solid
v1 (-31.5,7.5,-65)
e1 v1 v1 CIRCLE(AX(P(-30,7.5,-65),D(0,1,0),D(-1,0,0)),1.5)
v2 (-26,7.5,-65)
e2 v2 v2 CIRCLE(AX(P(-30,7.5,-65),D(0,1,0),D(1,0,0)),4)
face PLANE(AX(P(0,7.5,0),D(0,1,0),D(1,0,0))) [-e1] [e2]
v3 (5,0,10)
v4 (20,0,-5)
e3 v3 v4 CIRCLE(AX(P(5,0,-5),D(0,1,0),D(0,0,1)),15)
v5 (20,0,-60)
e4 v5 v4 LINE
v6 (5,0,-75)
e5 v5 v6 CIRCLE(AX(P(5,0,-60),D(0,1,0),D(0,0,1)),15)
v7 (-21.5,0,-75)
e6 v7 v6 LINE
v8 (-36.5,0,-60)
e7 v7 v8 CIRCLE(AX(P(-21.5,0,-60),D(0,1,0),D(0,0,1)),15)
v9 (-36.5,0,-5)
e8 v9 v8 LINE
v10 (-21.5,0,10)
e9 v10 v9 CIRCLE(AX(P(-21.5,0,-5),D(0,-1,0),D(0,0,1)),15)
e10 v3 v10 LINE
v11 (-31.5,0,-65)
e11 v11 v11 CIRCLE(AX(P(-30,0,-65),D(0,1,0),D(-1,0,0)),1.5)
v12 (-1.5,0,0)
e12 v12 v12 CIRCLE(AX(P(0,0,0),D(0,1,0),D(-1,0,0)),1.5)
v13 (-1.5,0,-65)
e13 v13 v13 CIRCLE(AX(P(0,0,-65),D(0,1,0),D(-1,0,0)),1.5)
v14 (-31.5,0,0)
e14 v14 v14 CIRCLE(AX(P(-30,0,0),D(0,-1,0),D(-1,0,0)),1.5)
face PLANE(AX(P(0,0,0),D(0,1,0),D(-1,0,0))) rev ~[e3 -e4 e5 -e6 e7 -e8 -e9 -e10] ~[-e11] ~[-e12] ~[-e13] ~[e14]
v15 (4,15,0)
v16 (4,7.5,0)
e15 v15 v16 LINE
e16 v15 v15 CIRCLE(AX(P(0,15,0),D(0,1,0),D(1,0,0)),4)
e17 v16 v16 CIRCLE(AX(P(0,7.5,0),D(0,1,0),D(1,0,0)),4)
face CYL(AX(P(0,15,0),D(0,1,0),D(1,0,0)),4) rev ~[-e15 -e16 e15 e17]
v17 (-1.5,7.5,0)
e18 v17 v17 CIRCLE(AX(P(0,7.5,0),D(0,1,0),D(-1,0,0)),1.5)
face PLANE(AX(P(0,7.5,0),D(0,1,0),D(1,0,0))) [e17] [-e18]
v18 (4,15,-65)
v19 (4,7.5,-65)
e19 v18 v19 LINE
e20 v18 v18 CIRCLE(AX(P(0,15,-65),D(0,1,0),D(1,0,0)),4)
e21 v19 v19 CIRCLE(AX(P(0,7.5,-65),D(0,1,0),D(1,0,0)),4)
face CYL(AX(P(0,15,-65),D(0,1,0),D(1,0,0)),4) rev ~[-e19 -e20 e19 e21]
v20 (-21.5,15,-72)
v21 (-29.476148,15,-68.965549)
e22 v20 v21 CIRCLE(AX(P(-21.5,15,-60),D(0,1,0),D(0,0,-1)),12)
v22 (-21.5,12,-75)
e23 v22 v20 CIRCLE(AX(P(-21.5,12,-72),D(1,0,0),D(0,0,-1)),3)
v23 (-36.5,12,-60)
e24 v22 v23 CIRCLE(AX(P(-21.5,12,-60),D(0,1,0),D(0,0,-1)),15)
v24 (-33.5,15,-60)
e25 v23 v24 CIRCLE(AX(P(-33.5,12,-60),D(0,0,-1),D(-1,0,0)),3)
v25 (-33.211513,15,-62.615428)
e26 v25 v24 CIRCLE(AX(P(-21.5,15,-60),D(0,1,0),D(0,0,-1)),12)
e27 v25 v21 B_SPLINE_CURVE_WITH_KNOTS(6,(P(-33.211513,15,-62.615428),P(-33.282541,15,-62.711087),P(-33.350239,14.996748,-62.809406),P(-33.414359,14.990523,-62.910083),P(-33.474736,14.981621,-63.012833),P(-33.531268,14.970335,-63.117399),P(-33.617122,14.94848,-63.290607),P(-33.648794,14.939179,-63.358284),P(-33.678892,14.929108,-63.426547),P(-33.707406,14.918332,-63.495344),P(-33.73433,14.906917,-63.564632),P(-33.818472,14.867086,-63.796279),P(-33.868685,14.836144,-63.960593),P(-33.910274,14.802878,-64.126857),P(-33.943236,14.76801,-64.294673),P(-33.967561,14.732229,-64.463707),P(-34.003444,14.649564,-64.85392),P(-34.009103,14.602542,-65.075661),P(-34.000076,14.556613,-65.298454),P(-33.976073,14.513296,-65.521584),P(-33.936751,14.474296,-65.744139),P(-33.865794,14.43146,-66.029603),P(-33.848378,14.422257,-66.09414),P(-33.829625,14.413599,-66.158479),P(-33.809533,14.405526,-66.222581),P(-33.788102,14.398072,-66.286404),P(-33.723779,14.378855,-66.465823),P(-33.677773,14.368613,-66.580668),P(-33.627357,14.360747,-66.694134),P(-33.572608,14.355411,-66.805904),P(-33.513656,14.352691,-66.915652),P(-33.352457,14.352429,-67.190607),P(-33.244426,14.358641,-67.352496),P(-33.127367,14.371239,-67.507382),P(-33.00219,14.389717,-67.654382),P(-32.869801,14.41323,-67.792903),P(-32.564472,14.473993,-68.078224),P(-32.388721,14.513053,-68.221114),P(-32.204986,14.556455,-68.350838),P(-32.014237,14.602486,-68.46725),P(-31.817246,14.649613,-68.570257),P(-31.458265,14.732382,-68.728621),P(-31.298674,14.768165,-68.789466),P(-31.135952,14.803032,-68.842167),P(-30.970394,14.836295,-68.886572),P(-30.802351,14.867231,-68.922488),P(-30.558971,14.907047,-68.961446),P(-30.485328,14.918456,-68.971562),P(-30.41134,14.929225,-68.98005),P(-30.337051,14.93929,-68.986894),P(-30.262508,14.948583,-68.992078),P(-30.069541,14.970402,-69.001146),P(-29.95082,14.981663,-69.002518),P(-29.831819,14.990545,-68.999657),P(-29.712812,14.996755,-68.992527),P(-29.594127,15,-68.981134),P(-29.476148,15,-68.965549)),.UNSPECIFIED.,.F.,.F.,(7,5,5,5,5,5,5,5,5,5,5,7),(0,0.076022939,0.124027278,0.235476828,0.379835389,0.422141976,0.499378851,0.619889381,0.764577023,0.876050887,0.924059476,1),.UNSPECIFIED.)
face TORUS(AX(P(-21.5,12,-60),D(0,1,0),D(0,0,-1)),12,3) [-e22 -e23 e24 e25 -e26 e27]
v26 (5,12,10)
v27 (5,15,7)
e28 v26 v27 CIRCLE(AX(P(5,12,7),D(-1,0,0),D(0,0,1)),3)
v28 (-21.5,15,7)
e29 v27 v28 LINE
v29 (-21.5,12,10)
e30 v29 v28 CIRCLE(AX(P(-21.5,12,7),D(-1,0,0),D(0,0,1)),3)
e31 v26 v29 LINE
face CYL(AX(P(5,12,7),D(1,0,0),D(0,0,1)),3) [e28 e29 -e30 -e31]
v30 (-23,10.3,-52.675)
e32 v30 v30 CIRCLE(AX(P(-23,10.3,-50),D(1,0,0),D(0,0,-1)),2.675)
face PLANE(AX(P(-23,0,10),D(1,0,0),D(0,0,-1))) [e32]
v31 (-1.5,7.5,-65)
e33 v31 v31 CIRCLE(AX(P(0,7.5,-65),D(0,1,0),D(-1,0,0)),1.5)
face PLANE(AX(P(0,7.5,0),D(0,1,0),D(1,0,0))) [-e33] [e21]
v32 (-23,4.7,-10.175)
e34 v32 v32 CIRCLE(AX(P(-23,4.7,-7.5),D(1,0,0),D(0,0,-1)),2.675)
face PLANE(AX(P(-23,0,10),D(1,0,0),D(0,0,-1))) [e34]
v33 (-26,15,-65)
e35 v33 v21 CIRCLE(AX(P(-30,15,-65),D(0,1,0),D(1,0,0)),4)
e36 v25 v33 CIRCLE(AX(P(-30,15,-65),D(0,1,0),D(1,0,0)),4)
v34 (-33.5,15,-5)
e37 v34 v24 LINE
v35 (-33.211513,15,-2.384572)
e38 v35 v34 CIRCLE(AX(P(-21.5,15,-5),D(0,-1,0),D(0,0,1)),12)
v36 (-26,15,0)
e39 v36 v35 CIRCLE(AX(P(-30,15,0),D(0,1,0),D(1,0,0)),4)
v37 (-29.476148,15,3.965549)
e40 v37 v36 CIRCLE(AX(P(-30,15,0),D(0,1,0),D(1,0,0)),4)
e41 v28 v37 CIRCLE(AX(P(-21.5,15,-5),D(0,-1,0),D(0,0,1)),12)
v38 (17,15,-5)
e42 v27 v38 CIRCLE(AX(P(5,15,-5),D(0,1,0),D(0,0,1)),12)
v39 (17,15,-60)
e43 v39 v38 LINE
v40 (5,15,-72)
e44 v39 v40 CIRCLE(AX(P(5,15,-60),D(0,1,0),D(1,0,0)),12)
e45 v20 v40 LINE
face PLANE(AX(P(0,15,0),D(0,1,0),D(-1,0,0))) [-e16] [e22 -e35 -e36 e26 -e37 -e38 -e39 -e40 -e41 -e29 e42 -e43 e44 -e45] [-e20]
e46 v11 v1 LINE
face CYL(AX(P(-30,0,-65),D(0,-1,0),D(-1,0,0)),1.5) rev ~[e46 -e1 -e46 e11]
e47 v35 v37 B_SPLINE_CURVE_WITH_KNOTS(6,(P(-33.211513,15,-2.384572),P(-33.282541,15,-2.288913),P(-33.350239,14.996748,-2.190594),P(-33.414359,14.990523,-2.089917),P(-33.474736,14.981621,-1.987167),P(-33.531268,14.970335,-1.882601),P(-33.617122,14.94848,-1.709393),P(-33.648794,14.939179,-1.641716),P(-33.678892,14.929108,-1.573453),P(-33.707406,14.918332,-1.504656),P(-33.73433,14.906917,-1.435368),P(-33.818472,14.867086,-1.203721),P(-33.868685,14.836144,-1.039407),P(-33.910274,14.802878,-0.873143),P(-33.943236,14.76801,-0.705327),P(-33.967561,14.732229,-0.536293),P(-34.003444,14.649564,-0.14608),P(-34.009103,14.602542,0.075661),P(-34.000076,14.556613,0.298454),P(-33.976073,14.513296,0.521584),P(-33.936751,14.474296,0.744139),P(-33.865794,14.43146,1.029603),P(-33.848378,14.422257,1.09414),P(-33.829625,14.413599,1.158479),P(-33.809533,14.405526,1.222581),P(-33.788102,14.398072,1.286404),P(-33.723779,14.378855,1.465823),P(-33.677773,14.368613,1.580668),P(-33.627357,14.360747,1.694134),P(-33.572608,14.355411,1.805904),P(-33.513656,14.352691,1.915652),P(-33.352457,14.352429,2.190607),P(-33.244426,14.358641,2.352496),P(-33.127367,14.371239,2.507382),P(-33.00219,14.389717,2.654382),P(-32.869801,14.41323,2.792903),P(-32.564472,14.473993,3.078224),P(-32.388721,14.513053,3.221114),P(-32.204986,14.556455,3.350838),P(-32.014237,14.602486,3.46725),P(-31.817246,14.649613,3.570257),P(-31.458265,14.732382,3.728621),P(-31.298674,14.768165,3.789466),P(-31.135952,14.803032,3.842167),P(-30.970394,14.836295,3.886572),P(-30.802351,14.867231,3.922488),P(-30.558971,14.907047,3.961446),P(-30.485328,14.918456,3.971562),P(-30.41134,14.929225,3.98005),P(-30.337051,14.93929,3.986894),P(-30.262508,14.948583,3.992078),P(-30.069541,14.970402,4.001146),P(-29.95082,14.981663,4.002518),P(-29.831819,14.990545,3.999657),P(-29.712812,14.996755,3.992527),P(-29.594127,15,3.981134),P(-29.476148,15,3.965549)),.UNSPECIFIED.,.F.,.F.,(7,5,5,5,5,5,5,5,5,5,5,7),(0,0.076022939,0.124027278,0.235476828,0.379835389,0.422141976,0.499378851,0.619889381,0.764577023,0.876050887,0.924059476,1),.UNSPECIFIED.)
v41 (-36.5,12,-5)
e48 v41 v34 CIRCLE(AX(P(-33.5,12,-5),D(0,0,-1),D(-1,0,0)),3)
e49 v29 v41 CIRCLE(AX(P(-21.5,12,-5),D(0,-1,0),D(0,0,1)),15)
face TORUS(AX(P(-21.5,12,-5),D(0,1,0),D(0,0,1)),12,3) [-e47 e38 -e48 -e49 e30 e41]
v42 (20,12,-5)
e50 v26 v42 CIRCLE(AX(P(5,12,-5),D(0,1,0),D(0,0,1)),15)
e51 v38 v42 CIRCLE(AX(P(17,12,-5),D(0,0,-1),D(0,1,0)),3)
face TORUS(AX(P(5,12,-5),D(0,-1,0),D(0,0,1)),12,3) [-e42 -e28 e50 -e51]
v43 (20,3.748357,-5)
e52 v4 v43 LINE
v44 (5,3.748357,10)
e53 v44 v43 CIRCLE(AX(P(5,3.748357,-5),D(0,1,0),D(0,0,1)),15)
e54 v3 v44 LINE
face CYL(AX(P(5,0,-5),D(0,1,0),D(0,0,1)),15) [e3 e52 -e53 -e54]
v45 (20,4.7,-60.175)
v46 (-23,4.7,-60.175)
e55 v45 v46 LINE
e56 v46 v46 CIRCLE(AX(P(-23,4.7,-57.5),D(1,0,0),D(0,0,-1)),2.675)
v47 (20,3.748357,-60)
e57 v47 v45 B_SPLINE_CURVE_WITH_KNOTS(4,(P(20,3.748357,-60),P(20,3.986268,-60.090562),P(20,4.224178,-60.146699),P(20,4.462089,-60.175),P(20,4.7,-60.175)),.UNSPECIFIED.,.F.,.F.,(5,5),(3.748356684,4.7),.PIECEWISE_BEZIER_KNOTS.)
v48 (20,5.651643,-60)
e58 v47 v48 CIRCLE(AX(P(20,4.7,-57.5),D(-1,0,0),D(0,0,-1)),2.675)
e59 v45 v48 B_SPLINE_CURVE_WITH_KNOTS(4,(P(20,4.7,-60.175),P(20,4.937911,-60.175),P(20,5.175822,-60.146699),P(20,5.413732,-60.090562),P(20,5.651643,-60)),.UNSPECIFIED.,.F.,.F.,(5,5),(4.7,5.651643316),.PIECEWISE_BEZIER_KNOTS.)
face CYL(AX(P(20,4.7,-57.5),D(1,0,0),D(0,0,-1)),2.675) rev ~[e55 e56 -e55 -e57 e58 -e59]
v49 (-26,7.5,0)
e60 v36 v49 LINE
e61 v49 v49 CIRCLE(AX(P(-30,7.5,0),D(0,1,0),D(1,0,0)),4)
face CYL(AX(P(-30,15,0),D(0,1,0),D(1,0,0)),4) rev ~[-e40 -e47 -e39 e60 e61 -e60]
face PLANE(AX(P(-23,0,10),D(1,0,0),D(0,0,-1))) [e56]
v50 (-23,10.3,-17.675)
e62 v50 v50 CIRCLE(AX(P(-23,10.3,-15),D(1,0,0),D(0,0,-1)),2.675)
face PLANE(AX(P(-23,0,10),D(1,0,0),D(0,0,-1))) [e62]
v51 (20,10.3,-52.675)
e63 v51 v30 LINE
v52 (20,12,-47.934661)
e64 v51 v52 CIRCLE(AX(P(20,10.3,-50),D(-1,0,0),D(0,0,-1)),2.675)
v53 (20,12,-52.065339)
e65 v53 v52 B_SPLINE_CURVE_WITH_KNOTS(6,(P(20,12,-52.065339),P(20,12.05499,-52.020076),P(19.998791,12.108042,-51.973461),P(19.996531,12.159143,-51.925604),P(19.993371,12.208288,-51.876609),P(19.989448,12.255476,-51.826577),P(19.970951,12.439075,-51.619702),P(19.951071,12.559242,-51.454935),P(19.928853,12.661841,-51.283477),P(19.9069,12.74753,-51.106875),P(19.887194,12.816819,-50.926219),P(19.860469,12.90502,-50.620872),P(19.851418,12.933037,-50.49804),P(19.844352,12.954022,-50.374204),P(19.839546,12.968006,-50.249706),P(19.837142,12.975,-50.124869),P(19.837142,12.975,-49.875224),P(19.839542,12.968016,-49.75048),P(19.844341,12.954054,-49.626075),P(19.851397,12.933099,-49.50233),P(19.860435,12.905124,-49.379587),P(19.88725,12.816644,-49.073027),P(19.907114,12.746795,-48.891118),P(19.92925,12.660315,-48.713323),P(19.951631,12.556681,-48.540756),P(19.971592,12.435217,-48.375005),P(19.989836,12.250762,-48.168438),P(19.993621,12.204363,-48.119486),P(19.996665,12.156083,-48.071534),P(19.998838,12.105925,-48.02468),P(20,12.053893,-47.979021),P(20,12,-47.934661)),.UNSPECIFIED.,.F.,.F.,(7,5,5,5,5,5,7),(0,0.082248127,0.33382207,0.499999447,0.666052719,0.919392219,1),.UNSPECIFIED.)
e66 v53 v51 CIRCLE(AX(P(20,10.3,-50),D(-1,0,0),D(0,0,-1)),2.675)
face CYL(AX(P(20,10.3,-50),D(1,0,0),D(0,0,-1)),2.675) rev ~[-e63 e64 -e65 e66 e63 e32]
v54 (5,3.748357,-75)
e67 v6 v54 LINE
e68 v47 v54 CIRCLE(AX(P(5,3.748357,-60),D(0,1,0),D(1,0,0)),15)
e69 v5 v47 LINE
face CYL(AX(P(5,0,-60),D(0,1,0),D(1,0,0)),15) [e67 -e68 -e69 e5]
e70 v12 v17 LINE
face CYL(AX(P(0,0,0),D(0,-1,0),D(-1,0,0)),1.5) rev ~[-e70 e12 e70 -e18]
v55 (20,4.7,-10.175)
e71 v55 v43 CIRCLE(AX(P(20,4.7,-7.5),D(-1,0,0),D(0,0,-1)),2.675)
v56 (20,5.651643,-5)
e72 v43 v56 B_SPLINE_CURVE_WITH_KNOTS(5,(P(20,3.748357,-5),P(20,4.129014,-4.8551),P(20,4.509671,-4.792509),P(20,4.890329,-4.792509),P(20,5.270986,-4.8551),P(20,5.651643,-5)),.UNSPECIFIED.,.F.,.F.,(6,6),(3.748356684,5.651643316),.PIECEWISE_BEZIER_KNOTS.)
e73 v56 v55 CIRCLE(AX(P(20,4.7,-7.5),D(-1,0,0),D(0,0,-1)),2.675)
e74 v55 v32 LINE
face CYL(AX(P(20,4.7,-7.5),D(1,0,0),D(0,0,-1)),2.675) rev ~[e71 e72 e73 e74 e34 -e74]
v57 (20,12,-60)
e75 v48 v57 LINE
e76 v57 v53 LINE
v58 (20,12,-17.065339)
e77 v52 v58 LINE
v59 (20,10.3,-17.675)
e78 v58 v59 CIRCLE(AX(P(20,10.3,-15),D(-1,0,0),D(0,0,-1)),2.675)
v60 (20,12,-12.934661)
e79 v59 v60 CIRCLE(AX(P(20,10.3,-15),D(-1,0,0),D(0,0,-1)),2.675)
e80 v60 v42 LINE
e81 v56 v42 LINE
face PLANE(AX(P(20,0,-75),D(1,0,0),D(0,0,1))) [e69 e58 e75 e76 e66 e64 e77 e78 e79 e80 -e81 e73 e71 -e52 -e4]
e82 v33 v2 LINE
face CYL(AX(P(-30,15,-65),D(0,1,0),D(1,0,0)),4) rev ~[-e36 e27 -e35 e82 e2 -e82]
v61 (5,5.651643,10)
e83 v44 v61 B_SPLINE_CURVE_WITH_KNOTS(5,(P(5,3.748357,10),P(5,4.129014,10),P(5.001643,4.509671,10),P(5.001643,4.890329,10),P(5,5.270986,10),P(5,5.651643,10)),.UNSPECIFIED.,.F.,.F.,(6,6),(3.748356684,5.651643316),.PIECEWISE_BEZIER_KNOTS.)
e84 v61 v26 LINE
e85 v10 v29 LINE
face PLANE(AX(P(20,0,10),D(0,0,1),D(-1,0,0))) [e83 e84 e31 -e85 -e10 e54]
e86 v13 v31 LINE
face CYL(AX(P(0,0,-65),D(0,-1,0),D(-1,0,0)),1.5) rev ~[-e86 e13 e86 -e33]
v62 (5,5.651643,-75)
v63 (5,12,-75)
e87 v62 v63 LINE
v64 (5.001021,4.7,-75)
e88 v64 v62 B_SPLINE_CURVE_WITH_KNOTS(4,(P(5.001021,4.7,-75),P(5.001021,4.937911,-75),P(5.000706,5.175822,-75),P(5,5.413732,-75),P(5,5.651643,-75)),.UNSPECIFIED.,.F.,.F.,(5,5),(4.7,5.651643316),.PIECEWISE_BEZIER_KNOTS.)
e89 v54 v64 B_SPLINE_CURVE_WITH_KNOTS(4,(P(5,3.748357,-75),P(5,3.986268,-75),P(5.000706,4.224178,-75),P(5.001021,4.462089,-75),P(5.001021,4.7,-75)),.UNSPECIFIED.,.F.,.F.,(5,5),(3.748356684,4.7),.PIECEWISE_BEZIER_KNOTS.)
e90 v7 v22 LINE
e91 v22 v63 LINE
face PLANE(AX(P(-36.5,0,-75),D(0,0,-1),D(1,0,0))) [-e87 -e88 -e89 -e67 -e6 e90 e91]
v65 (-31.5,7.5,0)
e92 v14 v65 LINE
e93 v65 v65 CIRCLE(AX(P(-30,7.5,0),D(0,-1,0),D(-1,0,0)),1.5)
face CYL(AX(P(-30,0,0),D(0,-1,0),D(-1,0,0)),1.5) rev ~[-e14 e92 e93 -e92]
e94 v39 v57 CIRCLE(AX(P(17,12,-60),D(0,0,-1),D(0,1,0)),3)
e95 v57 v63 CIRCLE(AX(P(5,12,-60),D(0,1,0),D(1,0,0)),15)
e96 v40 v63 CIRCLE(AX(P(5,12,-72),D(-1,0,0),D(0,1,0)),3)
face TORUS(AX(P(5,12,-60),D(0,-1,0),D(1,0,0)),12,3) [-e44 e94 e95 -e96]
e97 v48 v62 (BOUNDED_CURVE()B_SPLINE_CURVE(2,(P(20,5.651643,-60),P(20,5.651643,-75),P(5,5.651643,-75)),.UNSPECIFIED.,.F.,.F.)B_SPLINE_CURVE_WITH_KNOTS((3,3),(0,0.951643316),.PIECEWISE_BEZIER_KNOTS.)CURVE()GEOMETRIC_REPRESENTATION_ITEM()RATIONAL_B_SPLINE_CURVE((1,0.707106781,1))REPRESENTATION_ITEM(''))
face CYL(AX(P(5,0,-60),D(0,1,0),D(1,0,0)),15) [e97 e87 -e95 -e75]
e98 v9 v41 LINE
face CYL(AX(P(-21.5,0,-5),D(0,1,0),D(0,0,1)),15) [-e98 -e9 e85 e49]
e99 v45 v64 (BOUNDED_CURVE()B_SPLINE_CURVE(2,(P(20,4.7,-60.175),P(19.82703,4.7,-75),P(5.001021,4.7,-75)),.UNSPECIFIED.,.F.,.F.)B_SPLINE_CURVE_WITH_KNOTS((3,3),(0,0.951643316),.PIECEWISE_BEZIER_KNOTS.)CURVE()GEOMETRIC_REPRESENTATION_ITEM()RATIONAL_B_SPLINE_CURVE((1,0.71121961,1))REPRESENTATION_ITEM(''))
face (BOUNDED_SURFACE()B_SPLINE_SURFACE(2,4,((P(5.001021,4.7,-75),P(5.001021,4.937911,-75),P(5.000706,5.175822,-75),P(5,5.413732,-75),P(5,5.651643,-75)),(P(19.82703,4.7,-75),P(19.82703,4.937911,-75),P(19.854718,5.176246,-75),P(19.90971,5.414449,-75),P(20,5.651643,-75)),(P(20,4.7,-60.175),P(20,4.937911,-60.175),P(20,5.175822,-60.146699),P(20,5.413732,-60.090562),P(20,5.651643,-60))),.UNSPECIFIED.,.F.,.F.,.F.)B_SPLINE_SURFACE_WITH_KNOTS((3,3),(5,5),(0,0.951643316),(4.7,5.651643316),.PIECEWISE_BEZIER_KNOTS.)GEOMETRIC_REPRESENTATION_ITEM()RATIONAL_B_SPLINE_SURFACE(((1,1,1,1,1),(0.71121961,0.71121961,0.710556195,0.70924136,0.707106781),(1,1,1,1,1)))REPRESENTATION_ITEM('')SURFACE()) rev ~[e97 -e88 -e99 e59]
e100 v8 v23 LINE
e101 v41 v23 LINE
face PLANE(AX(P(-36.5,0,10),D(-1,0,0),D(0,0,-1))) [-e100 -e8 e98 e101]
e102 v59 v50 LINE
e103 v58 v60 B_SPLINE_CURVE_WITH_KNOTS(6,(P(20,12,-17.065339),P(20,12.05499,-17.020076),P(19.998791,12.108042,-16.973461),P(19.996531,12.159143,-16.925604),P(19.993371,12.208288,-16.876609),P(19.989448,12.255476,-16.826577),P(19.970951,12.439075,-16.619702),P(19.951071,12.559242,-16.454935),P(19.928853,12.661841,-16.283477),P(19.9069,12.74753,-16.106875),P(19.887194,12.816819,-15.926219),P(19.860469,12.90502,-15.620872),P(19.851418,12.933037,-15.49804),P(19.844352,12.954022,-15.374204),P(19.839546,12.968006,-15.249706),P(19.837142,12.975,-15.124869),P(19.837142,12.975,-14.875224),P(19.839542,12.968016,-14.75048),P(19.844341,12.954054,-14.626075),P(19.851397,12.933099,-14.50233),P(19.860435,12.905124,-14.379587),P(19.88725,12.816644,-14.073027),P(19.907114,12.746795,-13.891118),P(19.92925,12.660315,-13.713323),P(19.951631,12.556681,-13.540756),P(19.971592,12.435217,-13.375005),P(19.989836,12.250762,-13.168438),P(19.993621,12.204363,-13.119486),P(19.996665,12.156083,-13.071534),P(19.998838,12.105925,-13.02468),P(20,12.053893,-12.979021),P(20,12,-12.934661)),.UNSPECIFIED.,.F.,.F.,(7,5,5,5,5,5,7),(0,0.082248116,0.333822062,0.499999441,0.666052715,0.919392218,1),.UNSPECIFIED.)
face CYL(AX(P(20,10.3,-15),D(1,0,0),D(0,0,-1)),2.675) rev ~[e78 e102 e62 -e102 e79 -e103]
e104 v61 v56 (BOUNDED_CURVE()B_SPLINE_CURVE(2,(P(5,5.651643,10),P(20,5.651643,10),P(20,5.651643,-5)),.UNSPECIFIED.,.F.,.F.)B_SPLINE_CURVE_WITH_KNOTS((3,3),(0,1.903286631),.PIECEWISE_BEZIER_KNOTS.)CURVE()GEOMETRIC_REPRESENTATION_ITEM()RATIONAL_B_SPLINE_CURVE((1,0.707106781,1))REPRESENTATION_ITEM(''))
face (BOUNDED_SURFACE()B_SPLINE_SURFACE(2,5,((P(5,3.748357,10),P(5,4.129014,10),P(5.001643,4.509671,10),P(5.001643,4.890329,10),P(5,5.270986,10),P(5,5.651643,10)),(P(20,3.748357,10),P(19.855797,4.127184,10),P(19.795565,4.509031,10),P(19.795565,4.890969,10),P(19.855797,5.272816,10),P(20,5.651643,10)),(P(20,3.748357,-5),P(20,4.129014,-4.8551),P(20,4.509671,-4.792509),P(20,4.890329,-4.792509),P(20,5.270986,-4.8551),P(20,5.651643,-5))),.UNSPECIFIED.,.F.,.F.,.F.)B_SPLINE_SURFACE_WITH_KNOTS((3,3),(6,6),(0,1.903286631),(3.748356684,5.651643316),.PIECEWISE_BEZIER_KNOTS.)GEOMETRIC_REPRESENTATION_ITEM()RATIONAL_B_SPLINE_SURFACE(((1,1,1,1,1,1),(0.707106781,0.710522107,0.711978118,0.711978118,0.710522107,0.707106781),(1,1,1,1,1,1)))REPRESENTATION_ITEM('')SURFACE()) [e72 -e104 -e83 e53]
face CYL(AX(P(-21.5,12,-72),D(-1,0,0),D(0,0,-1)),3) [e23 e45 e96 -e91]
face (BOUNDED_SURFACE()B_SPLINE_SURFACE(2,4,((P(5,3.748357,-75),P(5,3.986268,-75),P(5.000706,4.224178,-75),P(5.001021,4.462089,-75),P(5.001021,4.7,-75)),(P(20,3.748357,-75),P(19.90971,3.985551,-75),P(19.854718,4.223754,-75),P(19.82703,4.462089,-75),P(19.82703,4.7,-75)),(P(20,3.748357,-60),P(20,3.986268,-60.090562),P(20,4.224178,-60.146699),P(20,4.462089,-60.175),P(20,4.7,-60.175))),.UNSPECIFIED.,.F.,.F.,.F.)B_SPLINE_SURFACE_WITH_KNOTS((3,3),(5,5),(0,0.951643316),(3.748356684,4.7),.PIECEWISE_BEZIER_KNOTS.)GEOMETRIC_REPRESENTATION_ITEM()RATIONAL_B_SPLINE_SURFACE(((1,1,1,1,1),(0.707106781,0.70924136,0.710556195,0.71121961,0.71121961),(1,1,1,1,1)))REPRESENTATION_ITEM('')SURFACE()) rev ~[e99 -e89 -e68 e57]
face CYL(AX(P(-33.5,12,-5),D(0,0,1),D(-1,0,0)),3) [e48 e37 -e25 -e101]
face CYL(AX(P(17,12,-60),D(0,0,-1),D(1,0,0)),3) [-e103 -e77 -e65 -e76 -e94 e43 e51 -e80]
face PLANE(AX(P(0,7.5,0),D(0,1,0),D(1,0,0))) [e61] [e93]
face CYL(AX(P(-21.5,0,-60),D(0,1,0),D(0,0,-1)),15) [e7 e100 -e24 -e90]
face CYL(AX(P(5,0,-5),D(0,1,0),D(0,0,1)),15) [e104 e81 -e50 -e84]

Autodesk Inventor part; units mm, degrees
ref_plane "YZ Plane" through (0, 0, 0) normal (1, 0, 0) x (0, 1, 0)
ref_plane "XZ Plane" through (0, 0, 0) normal (0, 1, 0) x (-1, 0, 0)
ref_plane "XY Plane" through (0, 0, 0) normal (0, 0, 1) x (1, 0, 0)
sketch "Sketch1" plane through (0, 0, 0) normal (0, 1, 0) x (-1, 0, 0)
  line L0 (0, 0) -> (30, 0)
  line L1 (30, 0) -> (30, -65)
  line L2 (30, -65) -> (0, -65)
  line L3 (0, -65) -> (0, 0)
  line L4 (-20, 10) -> (36.5, 10)
  line L5 (36.5, 10) -> (36.5, -75)
  line L6 (36.5, -75) -> (-20, -75)
  line L7 (-20, -75) -> (-20, 10)
  circle A0 centre (30, 0) radius 1.5
  circle A1 centre (30, -65) radius 1.5
  circle A2 centre (0, 0) radius 1.5
  circle A3 centre (0, -65) radius 1.5
  dimension "d0" = 30
  dimension "d1" = 65
  dimension "d2" = 10
  dimension "d3" = 6.5
  dimension "d4" = 10
  dimension "d5" = 20
  dimension "d6" = 3
  dimension "d7" = 3
  dimension "d8" = 3
  dimension "d9" = 3
extrude "Extrusion1" add sketch "Sketch1" along normal blind 15 contours L0 A0 L1 A1 L2 A3 L3 A2 | L4 L5 L6 L7
sketch "Sketch2" plane through (20, 0, 10) normal (1, 0, 0) x (0, 0, -1)
  line L0 (0, 0) -> (0, 15) projected
  line L1 (85, 0) -> (85, 15) projected
  line L2 (42.5, 4.7) -> (42.5, 11.9085)
  circle A0 centre (17.5, 4.7) radius 2.675
  circle A1 centre (67.5, 4.7) radius 2.675
  line L3 (0, 4.7) -> (85, 4.7)
  line L4 (0, 0) -> (85, 0) projected
  line L5 (0, 10.3) -> (85, 10.3)
  circle A2 centre (25, 10.3) radius 2.675
  circle A3 centre (60, 10.3) radius 2.675
  line L6 (0, 15) -> (85, 15) projected
  line L7 (17.5, 7.375) -> (26.8128, 7.375)
  point P0 (10, 0)
  dimension "d12" = 5.35
  dimension "d13" = 5.35
  dimension "d26" = 4.7
  dimension "d27" = 5.35
  dimension "d28" = 5.35
  dimension "d29" = 4.7
  dimension "d31" = 17.5
  dimension "d32" = 17.5
  dimension "d33" = 25
  dimension "d34" = 25
extrude "Extrusion2" cut sketch "Sketch2" against normal blind 43 contours L3 A0 | A0 L3 | A2 L5 | L5 A2 | L3 A1 | A1 L3 | A3 L5 | L5 A3
sketch "Sketch3" plane through (0, 15, 0) normal (0, 1, 0) x (1, 0, 0)
  circle A0 centre (-30, 0) radius 1.5 projected
  circle A1 centre (-30, 0) radius 4
  circle A2 centre (-30, 65) radius 1.5 projected
  circle A3 centre (-30, 65) radius 4
  circle A4 centre (0, 0) radius 1.5 projected
  circle A5 centre (0, 0) radius 4
  circle A6 centre (0, 65) radius 1.5 projected
  circle A7 centre (0, 65) radius 4
  dimension "d18" = 8
  dimension "d19" = 8
  dimension "d20" = 8
  dimension "d21" = 8
extrude "Extrusion3" cut sketch "Sketch3" against normal blind 7.5 contours A0 | A1 | A3 | A5 | A7
fillet "Fillet1" radius 15 4 edges at (-36.5, 7.5, 10) (20, 7.5, 10) (20, 7.5, -75) (-36.5, 7.5, -75)
sketch "Sketch4" plane through (-36.5, 0, -60) normal (-1, 0, 0) x (0, 0, 1)
  point P0 (60, 0)
fillet "Fillet3" radius 3 8 edges at (15.6066, 15, -70.6066) (-8.25, 15, -75) (-32.1066, 15, -70.6066) (-36.5, 15, -32.5) (-32.1066, 15, 5.6066) (-8.25, 15, 10) (15.6066, 15, 5.6066) (20, 15, -32.5)
properties part number "BaseStabilizerAttachment"
